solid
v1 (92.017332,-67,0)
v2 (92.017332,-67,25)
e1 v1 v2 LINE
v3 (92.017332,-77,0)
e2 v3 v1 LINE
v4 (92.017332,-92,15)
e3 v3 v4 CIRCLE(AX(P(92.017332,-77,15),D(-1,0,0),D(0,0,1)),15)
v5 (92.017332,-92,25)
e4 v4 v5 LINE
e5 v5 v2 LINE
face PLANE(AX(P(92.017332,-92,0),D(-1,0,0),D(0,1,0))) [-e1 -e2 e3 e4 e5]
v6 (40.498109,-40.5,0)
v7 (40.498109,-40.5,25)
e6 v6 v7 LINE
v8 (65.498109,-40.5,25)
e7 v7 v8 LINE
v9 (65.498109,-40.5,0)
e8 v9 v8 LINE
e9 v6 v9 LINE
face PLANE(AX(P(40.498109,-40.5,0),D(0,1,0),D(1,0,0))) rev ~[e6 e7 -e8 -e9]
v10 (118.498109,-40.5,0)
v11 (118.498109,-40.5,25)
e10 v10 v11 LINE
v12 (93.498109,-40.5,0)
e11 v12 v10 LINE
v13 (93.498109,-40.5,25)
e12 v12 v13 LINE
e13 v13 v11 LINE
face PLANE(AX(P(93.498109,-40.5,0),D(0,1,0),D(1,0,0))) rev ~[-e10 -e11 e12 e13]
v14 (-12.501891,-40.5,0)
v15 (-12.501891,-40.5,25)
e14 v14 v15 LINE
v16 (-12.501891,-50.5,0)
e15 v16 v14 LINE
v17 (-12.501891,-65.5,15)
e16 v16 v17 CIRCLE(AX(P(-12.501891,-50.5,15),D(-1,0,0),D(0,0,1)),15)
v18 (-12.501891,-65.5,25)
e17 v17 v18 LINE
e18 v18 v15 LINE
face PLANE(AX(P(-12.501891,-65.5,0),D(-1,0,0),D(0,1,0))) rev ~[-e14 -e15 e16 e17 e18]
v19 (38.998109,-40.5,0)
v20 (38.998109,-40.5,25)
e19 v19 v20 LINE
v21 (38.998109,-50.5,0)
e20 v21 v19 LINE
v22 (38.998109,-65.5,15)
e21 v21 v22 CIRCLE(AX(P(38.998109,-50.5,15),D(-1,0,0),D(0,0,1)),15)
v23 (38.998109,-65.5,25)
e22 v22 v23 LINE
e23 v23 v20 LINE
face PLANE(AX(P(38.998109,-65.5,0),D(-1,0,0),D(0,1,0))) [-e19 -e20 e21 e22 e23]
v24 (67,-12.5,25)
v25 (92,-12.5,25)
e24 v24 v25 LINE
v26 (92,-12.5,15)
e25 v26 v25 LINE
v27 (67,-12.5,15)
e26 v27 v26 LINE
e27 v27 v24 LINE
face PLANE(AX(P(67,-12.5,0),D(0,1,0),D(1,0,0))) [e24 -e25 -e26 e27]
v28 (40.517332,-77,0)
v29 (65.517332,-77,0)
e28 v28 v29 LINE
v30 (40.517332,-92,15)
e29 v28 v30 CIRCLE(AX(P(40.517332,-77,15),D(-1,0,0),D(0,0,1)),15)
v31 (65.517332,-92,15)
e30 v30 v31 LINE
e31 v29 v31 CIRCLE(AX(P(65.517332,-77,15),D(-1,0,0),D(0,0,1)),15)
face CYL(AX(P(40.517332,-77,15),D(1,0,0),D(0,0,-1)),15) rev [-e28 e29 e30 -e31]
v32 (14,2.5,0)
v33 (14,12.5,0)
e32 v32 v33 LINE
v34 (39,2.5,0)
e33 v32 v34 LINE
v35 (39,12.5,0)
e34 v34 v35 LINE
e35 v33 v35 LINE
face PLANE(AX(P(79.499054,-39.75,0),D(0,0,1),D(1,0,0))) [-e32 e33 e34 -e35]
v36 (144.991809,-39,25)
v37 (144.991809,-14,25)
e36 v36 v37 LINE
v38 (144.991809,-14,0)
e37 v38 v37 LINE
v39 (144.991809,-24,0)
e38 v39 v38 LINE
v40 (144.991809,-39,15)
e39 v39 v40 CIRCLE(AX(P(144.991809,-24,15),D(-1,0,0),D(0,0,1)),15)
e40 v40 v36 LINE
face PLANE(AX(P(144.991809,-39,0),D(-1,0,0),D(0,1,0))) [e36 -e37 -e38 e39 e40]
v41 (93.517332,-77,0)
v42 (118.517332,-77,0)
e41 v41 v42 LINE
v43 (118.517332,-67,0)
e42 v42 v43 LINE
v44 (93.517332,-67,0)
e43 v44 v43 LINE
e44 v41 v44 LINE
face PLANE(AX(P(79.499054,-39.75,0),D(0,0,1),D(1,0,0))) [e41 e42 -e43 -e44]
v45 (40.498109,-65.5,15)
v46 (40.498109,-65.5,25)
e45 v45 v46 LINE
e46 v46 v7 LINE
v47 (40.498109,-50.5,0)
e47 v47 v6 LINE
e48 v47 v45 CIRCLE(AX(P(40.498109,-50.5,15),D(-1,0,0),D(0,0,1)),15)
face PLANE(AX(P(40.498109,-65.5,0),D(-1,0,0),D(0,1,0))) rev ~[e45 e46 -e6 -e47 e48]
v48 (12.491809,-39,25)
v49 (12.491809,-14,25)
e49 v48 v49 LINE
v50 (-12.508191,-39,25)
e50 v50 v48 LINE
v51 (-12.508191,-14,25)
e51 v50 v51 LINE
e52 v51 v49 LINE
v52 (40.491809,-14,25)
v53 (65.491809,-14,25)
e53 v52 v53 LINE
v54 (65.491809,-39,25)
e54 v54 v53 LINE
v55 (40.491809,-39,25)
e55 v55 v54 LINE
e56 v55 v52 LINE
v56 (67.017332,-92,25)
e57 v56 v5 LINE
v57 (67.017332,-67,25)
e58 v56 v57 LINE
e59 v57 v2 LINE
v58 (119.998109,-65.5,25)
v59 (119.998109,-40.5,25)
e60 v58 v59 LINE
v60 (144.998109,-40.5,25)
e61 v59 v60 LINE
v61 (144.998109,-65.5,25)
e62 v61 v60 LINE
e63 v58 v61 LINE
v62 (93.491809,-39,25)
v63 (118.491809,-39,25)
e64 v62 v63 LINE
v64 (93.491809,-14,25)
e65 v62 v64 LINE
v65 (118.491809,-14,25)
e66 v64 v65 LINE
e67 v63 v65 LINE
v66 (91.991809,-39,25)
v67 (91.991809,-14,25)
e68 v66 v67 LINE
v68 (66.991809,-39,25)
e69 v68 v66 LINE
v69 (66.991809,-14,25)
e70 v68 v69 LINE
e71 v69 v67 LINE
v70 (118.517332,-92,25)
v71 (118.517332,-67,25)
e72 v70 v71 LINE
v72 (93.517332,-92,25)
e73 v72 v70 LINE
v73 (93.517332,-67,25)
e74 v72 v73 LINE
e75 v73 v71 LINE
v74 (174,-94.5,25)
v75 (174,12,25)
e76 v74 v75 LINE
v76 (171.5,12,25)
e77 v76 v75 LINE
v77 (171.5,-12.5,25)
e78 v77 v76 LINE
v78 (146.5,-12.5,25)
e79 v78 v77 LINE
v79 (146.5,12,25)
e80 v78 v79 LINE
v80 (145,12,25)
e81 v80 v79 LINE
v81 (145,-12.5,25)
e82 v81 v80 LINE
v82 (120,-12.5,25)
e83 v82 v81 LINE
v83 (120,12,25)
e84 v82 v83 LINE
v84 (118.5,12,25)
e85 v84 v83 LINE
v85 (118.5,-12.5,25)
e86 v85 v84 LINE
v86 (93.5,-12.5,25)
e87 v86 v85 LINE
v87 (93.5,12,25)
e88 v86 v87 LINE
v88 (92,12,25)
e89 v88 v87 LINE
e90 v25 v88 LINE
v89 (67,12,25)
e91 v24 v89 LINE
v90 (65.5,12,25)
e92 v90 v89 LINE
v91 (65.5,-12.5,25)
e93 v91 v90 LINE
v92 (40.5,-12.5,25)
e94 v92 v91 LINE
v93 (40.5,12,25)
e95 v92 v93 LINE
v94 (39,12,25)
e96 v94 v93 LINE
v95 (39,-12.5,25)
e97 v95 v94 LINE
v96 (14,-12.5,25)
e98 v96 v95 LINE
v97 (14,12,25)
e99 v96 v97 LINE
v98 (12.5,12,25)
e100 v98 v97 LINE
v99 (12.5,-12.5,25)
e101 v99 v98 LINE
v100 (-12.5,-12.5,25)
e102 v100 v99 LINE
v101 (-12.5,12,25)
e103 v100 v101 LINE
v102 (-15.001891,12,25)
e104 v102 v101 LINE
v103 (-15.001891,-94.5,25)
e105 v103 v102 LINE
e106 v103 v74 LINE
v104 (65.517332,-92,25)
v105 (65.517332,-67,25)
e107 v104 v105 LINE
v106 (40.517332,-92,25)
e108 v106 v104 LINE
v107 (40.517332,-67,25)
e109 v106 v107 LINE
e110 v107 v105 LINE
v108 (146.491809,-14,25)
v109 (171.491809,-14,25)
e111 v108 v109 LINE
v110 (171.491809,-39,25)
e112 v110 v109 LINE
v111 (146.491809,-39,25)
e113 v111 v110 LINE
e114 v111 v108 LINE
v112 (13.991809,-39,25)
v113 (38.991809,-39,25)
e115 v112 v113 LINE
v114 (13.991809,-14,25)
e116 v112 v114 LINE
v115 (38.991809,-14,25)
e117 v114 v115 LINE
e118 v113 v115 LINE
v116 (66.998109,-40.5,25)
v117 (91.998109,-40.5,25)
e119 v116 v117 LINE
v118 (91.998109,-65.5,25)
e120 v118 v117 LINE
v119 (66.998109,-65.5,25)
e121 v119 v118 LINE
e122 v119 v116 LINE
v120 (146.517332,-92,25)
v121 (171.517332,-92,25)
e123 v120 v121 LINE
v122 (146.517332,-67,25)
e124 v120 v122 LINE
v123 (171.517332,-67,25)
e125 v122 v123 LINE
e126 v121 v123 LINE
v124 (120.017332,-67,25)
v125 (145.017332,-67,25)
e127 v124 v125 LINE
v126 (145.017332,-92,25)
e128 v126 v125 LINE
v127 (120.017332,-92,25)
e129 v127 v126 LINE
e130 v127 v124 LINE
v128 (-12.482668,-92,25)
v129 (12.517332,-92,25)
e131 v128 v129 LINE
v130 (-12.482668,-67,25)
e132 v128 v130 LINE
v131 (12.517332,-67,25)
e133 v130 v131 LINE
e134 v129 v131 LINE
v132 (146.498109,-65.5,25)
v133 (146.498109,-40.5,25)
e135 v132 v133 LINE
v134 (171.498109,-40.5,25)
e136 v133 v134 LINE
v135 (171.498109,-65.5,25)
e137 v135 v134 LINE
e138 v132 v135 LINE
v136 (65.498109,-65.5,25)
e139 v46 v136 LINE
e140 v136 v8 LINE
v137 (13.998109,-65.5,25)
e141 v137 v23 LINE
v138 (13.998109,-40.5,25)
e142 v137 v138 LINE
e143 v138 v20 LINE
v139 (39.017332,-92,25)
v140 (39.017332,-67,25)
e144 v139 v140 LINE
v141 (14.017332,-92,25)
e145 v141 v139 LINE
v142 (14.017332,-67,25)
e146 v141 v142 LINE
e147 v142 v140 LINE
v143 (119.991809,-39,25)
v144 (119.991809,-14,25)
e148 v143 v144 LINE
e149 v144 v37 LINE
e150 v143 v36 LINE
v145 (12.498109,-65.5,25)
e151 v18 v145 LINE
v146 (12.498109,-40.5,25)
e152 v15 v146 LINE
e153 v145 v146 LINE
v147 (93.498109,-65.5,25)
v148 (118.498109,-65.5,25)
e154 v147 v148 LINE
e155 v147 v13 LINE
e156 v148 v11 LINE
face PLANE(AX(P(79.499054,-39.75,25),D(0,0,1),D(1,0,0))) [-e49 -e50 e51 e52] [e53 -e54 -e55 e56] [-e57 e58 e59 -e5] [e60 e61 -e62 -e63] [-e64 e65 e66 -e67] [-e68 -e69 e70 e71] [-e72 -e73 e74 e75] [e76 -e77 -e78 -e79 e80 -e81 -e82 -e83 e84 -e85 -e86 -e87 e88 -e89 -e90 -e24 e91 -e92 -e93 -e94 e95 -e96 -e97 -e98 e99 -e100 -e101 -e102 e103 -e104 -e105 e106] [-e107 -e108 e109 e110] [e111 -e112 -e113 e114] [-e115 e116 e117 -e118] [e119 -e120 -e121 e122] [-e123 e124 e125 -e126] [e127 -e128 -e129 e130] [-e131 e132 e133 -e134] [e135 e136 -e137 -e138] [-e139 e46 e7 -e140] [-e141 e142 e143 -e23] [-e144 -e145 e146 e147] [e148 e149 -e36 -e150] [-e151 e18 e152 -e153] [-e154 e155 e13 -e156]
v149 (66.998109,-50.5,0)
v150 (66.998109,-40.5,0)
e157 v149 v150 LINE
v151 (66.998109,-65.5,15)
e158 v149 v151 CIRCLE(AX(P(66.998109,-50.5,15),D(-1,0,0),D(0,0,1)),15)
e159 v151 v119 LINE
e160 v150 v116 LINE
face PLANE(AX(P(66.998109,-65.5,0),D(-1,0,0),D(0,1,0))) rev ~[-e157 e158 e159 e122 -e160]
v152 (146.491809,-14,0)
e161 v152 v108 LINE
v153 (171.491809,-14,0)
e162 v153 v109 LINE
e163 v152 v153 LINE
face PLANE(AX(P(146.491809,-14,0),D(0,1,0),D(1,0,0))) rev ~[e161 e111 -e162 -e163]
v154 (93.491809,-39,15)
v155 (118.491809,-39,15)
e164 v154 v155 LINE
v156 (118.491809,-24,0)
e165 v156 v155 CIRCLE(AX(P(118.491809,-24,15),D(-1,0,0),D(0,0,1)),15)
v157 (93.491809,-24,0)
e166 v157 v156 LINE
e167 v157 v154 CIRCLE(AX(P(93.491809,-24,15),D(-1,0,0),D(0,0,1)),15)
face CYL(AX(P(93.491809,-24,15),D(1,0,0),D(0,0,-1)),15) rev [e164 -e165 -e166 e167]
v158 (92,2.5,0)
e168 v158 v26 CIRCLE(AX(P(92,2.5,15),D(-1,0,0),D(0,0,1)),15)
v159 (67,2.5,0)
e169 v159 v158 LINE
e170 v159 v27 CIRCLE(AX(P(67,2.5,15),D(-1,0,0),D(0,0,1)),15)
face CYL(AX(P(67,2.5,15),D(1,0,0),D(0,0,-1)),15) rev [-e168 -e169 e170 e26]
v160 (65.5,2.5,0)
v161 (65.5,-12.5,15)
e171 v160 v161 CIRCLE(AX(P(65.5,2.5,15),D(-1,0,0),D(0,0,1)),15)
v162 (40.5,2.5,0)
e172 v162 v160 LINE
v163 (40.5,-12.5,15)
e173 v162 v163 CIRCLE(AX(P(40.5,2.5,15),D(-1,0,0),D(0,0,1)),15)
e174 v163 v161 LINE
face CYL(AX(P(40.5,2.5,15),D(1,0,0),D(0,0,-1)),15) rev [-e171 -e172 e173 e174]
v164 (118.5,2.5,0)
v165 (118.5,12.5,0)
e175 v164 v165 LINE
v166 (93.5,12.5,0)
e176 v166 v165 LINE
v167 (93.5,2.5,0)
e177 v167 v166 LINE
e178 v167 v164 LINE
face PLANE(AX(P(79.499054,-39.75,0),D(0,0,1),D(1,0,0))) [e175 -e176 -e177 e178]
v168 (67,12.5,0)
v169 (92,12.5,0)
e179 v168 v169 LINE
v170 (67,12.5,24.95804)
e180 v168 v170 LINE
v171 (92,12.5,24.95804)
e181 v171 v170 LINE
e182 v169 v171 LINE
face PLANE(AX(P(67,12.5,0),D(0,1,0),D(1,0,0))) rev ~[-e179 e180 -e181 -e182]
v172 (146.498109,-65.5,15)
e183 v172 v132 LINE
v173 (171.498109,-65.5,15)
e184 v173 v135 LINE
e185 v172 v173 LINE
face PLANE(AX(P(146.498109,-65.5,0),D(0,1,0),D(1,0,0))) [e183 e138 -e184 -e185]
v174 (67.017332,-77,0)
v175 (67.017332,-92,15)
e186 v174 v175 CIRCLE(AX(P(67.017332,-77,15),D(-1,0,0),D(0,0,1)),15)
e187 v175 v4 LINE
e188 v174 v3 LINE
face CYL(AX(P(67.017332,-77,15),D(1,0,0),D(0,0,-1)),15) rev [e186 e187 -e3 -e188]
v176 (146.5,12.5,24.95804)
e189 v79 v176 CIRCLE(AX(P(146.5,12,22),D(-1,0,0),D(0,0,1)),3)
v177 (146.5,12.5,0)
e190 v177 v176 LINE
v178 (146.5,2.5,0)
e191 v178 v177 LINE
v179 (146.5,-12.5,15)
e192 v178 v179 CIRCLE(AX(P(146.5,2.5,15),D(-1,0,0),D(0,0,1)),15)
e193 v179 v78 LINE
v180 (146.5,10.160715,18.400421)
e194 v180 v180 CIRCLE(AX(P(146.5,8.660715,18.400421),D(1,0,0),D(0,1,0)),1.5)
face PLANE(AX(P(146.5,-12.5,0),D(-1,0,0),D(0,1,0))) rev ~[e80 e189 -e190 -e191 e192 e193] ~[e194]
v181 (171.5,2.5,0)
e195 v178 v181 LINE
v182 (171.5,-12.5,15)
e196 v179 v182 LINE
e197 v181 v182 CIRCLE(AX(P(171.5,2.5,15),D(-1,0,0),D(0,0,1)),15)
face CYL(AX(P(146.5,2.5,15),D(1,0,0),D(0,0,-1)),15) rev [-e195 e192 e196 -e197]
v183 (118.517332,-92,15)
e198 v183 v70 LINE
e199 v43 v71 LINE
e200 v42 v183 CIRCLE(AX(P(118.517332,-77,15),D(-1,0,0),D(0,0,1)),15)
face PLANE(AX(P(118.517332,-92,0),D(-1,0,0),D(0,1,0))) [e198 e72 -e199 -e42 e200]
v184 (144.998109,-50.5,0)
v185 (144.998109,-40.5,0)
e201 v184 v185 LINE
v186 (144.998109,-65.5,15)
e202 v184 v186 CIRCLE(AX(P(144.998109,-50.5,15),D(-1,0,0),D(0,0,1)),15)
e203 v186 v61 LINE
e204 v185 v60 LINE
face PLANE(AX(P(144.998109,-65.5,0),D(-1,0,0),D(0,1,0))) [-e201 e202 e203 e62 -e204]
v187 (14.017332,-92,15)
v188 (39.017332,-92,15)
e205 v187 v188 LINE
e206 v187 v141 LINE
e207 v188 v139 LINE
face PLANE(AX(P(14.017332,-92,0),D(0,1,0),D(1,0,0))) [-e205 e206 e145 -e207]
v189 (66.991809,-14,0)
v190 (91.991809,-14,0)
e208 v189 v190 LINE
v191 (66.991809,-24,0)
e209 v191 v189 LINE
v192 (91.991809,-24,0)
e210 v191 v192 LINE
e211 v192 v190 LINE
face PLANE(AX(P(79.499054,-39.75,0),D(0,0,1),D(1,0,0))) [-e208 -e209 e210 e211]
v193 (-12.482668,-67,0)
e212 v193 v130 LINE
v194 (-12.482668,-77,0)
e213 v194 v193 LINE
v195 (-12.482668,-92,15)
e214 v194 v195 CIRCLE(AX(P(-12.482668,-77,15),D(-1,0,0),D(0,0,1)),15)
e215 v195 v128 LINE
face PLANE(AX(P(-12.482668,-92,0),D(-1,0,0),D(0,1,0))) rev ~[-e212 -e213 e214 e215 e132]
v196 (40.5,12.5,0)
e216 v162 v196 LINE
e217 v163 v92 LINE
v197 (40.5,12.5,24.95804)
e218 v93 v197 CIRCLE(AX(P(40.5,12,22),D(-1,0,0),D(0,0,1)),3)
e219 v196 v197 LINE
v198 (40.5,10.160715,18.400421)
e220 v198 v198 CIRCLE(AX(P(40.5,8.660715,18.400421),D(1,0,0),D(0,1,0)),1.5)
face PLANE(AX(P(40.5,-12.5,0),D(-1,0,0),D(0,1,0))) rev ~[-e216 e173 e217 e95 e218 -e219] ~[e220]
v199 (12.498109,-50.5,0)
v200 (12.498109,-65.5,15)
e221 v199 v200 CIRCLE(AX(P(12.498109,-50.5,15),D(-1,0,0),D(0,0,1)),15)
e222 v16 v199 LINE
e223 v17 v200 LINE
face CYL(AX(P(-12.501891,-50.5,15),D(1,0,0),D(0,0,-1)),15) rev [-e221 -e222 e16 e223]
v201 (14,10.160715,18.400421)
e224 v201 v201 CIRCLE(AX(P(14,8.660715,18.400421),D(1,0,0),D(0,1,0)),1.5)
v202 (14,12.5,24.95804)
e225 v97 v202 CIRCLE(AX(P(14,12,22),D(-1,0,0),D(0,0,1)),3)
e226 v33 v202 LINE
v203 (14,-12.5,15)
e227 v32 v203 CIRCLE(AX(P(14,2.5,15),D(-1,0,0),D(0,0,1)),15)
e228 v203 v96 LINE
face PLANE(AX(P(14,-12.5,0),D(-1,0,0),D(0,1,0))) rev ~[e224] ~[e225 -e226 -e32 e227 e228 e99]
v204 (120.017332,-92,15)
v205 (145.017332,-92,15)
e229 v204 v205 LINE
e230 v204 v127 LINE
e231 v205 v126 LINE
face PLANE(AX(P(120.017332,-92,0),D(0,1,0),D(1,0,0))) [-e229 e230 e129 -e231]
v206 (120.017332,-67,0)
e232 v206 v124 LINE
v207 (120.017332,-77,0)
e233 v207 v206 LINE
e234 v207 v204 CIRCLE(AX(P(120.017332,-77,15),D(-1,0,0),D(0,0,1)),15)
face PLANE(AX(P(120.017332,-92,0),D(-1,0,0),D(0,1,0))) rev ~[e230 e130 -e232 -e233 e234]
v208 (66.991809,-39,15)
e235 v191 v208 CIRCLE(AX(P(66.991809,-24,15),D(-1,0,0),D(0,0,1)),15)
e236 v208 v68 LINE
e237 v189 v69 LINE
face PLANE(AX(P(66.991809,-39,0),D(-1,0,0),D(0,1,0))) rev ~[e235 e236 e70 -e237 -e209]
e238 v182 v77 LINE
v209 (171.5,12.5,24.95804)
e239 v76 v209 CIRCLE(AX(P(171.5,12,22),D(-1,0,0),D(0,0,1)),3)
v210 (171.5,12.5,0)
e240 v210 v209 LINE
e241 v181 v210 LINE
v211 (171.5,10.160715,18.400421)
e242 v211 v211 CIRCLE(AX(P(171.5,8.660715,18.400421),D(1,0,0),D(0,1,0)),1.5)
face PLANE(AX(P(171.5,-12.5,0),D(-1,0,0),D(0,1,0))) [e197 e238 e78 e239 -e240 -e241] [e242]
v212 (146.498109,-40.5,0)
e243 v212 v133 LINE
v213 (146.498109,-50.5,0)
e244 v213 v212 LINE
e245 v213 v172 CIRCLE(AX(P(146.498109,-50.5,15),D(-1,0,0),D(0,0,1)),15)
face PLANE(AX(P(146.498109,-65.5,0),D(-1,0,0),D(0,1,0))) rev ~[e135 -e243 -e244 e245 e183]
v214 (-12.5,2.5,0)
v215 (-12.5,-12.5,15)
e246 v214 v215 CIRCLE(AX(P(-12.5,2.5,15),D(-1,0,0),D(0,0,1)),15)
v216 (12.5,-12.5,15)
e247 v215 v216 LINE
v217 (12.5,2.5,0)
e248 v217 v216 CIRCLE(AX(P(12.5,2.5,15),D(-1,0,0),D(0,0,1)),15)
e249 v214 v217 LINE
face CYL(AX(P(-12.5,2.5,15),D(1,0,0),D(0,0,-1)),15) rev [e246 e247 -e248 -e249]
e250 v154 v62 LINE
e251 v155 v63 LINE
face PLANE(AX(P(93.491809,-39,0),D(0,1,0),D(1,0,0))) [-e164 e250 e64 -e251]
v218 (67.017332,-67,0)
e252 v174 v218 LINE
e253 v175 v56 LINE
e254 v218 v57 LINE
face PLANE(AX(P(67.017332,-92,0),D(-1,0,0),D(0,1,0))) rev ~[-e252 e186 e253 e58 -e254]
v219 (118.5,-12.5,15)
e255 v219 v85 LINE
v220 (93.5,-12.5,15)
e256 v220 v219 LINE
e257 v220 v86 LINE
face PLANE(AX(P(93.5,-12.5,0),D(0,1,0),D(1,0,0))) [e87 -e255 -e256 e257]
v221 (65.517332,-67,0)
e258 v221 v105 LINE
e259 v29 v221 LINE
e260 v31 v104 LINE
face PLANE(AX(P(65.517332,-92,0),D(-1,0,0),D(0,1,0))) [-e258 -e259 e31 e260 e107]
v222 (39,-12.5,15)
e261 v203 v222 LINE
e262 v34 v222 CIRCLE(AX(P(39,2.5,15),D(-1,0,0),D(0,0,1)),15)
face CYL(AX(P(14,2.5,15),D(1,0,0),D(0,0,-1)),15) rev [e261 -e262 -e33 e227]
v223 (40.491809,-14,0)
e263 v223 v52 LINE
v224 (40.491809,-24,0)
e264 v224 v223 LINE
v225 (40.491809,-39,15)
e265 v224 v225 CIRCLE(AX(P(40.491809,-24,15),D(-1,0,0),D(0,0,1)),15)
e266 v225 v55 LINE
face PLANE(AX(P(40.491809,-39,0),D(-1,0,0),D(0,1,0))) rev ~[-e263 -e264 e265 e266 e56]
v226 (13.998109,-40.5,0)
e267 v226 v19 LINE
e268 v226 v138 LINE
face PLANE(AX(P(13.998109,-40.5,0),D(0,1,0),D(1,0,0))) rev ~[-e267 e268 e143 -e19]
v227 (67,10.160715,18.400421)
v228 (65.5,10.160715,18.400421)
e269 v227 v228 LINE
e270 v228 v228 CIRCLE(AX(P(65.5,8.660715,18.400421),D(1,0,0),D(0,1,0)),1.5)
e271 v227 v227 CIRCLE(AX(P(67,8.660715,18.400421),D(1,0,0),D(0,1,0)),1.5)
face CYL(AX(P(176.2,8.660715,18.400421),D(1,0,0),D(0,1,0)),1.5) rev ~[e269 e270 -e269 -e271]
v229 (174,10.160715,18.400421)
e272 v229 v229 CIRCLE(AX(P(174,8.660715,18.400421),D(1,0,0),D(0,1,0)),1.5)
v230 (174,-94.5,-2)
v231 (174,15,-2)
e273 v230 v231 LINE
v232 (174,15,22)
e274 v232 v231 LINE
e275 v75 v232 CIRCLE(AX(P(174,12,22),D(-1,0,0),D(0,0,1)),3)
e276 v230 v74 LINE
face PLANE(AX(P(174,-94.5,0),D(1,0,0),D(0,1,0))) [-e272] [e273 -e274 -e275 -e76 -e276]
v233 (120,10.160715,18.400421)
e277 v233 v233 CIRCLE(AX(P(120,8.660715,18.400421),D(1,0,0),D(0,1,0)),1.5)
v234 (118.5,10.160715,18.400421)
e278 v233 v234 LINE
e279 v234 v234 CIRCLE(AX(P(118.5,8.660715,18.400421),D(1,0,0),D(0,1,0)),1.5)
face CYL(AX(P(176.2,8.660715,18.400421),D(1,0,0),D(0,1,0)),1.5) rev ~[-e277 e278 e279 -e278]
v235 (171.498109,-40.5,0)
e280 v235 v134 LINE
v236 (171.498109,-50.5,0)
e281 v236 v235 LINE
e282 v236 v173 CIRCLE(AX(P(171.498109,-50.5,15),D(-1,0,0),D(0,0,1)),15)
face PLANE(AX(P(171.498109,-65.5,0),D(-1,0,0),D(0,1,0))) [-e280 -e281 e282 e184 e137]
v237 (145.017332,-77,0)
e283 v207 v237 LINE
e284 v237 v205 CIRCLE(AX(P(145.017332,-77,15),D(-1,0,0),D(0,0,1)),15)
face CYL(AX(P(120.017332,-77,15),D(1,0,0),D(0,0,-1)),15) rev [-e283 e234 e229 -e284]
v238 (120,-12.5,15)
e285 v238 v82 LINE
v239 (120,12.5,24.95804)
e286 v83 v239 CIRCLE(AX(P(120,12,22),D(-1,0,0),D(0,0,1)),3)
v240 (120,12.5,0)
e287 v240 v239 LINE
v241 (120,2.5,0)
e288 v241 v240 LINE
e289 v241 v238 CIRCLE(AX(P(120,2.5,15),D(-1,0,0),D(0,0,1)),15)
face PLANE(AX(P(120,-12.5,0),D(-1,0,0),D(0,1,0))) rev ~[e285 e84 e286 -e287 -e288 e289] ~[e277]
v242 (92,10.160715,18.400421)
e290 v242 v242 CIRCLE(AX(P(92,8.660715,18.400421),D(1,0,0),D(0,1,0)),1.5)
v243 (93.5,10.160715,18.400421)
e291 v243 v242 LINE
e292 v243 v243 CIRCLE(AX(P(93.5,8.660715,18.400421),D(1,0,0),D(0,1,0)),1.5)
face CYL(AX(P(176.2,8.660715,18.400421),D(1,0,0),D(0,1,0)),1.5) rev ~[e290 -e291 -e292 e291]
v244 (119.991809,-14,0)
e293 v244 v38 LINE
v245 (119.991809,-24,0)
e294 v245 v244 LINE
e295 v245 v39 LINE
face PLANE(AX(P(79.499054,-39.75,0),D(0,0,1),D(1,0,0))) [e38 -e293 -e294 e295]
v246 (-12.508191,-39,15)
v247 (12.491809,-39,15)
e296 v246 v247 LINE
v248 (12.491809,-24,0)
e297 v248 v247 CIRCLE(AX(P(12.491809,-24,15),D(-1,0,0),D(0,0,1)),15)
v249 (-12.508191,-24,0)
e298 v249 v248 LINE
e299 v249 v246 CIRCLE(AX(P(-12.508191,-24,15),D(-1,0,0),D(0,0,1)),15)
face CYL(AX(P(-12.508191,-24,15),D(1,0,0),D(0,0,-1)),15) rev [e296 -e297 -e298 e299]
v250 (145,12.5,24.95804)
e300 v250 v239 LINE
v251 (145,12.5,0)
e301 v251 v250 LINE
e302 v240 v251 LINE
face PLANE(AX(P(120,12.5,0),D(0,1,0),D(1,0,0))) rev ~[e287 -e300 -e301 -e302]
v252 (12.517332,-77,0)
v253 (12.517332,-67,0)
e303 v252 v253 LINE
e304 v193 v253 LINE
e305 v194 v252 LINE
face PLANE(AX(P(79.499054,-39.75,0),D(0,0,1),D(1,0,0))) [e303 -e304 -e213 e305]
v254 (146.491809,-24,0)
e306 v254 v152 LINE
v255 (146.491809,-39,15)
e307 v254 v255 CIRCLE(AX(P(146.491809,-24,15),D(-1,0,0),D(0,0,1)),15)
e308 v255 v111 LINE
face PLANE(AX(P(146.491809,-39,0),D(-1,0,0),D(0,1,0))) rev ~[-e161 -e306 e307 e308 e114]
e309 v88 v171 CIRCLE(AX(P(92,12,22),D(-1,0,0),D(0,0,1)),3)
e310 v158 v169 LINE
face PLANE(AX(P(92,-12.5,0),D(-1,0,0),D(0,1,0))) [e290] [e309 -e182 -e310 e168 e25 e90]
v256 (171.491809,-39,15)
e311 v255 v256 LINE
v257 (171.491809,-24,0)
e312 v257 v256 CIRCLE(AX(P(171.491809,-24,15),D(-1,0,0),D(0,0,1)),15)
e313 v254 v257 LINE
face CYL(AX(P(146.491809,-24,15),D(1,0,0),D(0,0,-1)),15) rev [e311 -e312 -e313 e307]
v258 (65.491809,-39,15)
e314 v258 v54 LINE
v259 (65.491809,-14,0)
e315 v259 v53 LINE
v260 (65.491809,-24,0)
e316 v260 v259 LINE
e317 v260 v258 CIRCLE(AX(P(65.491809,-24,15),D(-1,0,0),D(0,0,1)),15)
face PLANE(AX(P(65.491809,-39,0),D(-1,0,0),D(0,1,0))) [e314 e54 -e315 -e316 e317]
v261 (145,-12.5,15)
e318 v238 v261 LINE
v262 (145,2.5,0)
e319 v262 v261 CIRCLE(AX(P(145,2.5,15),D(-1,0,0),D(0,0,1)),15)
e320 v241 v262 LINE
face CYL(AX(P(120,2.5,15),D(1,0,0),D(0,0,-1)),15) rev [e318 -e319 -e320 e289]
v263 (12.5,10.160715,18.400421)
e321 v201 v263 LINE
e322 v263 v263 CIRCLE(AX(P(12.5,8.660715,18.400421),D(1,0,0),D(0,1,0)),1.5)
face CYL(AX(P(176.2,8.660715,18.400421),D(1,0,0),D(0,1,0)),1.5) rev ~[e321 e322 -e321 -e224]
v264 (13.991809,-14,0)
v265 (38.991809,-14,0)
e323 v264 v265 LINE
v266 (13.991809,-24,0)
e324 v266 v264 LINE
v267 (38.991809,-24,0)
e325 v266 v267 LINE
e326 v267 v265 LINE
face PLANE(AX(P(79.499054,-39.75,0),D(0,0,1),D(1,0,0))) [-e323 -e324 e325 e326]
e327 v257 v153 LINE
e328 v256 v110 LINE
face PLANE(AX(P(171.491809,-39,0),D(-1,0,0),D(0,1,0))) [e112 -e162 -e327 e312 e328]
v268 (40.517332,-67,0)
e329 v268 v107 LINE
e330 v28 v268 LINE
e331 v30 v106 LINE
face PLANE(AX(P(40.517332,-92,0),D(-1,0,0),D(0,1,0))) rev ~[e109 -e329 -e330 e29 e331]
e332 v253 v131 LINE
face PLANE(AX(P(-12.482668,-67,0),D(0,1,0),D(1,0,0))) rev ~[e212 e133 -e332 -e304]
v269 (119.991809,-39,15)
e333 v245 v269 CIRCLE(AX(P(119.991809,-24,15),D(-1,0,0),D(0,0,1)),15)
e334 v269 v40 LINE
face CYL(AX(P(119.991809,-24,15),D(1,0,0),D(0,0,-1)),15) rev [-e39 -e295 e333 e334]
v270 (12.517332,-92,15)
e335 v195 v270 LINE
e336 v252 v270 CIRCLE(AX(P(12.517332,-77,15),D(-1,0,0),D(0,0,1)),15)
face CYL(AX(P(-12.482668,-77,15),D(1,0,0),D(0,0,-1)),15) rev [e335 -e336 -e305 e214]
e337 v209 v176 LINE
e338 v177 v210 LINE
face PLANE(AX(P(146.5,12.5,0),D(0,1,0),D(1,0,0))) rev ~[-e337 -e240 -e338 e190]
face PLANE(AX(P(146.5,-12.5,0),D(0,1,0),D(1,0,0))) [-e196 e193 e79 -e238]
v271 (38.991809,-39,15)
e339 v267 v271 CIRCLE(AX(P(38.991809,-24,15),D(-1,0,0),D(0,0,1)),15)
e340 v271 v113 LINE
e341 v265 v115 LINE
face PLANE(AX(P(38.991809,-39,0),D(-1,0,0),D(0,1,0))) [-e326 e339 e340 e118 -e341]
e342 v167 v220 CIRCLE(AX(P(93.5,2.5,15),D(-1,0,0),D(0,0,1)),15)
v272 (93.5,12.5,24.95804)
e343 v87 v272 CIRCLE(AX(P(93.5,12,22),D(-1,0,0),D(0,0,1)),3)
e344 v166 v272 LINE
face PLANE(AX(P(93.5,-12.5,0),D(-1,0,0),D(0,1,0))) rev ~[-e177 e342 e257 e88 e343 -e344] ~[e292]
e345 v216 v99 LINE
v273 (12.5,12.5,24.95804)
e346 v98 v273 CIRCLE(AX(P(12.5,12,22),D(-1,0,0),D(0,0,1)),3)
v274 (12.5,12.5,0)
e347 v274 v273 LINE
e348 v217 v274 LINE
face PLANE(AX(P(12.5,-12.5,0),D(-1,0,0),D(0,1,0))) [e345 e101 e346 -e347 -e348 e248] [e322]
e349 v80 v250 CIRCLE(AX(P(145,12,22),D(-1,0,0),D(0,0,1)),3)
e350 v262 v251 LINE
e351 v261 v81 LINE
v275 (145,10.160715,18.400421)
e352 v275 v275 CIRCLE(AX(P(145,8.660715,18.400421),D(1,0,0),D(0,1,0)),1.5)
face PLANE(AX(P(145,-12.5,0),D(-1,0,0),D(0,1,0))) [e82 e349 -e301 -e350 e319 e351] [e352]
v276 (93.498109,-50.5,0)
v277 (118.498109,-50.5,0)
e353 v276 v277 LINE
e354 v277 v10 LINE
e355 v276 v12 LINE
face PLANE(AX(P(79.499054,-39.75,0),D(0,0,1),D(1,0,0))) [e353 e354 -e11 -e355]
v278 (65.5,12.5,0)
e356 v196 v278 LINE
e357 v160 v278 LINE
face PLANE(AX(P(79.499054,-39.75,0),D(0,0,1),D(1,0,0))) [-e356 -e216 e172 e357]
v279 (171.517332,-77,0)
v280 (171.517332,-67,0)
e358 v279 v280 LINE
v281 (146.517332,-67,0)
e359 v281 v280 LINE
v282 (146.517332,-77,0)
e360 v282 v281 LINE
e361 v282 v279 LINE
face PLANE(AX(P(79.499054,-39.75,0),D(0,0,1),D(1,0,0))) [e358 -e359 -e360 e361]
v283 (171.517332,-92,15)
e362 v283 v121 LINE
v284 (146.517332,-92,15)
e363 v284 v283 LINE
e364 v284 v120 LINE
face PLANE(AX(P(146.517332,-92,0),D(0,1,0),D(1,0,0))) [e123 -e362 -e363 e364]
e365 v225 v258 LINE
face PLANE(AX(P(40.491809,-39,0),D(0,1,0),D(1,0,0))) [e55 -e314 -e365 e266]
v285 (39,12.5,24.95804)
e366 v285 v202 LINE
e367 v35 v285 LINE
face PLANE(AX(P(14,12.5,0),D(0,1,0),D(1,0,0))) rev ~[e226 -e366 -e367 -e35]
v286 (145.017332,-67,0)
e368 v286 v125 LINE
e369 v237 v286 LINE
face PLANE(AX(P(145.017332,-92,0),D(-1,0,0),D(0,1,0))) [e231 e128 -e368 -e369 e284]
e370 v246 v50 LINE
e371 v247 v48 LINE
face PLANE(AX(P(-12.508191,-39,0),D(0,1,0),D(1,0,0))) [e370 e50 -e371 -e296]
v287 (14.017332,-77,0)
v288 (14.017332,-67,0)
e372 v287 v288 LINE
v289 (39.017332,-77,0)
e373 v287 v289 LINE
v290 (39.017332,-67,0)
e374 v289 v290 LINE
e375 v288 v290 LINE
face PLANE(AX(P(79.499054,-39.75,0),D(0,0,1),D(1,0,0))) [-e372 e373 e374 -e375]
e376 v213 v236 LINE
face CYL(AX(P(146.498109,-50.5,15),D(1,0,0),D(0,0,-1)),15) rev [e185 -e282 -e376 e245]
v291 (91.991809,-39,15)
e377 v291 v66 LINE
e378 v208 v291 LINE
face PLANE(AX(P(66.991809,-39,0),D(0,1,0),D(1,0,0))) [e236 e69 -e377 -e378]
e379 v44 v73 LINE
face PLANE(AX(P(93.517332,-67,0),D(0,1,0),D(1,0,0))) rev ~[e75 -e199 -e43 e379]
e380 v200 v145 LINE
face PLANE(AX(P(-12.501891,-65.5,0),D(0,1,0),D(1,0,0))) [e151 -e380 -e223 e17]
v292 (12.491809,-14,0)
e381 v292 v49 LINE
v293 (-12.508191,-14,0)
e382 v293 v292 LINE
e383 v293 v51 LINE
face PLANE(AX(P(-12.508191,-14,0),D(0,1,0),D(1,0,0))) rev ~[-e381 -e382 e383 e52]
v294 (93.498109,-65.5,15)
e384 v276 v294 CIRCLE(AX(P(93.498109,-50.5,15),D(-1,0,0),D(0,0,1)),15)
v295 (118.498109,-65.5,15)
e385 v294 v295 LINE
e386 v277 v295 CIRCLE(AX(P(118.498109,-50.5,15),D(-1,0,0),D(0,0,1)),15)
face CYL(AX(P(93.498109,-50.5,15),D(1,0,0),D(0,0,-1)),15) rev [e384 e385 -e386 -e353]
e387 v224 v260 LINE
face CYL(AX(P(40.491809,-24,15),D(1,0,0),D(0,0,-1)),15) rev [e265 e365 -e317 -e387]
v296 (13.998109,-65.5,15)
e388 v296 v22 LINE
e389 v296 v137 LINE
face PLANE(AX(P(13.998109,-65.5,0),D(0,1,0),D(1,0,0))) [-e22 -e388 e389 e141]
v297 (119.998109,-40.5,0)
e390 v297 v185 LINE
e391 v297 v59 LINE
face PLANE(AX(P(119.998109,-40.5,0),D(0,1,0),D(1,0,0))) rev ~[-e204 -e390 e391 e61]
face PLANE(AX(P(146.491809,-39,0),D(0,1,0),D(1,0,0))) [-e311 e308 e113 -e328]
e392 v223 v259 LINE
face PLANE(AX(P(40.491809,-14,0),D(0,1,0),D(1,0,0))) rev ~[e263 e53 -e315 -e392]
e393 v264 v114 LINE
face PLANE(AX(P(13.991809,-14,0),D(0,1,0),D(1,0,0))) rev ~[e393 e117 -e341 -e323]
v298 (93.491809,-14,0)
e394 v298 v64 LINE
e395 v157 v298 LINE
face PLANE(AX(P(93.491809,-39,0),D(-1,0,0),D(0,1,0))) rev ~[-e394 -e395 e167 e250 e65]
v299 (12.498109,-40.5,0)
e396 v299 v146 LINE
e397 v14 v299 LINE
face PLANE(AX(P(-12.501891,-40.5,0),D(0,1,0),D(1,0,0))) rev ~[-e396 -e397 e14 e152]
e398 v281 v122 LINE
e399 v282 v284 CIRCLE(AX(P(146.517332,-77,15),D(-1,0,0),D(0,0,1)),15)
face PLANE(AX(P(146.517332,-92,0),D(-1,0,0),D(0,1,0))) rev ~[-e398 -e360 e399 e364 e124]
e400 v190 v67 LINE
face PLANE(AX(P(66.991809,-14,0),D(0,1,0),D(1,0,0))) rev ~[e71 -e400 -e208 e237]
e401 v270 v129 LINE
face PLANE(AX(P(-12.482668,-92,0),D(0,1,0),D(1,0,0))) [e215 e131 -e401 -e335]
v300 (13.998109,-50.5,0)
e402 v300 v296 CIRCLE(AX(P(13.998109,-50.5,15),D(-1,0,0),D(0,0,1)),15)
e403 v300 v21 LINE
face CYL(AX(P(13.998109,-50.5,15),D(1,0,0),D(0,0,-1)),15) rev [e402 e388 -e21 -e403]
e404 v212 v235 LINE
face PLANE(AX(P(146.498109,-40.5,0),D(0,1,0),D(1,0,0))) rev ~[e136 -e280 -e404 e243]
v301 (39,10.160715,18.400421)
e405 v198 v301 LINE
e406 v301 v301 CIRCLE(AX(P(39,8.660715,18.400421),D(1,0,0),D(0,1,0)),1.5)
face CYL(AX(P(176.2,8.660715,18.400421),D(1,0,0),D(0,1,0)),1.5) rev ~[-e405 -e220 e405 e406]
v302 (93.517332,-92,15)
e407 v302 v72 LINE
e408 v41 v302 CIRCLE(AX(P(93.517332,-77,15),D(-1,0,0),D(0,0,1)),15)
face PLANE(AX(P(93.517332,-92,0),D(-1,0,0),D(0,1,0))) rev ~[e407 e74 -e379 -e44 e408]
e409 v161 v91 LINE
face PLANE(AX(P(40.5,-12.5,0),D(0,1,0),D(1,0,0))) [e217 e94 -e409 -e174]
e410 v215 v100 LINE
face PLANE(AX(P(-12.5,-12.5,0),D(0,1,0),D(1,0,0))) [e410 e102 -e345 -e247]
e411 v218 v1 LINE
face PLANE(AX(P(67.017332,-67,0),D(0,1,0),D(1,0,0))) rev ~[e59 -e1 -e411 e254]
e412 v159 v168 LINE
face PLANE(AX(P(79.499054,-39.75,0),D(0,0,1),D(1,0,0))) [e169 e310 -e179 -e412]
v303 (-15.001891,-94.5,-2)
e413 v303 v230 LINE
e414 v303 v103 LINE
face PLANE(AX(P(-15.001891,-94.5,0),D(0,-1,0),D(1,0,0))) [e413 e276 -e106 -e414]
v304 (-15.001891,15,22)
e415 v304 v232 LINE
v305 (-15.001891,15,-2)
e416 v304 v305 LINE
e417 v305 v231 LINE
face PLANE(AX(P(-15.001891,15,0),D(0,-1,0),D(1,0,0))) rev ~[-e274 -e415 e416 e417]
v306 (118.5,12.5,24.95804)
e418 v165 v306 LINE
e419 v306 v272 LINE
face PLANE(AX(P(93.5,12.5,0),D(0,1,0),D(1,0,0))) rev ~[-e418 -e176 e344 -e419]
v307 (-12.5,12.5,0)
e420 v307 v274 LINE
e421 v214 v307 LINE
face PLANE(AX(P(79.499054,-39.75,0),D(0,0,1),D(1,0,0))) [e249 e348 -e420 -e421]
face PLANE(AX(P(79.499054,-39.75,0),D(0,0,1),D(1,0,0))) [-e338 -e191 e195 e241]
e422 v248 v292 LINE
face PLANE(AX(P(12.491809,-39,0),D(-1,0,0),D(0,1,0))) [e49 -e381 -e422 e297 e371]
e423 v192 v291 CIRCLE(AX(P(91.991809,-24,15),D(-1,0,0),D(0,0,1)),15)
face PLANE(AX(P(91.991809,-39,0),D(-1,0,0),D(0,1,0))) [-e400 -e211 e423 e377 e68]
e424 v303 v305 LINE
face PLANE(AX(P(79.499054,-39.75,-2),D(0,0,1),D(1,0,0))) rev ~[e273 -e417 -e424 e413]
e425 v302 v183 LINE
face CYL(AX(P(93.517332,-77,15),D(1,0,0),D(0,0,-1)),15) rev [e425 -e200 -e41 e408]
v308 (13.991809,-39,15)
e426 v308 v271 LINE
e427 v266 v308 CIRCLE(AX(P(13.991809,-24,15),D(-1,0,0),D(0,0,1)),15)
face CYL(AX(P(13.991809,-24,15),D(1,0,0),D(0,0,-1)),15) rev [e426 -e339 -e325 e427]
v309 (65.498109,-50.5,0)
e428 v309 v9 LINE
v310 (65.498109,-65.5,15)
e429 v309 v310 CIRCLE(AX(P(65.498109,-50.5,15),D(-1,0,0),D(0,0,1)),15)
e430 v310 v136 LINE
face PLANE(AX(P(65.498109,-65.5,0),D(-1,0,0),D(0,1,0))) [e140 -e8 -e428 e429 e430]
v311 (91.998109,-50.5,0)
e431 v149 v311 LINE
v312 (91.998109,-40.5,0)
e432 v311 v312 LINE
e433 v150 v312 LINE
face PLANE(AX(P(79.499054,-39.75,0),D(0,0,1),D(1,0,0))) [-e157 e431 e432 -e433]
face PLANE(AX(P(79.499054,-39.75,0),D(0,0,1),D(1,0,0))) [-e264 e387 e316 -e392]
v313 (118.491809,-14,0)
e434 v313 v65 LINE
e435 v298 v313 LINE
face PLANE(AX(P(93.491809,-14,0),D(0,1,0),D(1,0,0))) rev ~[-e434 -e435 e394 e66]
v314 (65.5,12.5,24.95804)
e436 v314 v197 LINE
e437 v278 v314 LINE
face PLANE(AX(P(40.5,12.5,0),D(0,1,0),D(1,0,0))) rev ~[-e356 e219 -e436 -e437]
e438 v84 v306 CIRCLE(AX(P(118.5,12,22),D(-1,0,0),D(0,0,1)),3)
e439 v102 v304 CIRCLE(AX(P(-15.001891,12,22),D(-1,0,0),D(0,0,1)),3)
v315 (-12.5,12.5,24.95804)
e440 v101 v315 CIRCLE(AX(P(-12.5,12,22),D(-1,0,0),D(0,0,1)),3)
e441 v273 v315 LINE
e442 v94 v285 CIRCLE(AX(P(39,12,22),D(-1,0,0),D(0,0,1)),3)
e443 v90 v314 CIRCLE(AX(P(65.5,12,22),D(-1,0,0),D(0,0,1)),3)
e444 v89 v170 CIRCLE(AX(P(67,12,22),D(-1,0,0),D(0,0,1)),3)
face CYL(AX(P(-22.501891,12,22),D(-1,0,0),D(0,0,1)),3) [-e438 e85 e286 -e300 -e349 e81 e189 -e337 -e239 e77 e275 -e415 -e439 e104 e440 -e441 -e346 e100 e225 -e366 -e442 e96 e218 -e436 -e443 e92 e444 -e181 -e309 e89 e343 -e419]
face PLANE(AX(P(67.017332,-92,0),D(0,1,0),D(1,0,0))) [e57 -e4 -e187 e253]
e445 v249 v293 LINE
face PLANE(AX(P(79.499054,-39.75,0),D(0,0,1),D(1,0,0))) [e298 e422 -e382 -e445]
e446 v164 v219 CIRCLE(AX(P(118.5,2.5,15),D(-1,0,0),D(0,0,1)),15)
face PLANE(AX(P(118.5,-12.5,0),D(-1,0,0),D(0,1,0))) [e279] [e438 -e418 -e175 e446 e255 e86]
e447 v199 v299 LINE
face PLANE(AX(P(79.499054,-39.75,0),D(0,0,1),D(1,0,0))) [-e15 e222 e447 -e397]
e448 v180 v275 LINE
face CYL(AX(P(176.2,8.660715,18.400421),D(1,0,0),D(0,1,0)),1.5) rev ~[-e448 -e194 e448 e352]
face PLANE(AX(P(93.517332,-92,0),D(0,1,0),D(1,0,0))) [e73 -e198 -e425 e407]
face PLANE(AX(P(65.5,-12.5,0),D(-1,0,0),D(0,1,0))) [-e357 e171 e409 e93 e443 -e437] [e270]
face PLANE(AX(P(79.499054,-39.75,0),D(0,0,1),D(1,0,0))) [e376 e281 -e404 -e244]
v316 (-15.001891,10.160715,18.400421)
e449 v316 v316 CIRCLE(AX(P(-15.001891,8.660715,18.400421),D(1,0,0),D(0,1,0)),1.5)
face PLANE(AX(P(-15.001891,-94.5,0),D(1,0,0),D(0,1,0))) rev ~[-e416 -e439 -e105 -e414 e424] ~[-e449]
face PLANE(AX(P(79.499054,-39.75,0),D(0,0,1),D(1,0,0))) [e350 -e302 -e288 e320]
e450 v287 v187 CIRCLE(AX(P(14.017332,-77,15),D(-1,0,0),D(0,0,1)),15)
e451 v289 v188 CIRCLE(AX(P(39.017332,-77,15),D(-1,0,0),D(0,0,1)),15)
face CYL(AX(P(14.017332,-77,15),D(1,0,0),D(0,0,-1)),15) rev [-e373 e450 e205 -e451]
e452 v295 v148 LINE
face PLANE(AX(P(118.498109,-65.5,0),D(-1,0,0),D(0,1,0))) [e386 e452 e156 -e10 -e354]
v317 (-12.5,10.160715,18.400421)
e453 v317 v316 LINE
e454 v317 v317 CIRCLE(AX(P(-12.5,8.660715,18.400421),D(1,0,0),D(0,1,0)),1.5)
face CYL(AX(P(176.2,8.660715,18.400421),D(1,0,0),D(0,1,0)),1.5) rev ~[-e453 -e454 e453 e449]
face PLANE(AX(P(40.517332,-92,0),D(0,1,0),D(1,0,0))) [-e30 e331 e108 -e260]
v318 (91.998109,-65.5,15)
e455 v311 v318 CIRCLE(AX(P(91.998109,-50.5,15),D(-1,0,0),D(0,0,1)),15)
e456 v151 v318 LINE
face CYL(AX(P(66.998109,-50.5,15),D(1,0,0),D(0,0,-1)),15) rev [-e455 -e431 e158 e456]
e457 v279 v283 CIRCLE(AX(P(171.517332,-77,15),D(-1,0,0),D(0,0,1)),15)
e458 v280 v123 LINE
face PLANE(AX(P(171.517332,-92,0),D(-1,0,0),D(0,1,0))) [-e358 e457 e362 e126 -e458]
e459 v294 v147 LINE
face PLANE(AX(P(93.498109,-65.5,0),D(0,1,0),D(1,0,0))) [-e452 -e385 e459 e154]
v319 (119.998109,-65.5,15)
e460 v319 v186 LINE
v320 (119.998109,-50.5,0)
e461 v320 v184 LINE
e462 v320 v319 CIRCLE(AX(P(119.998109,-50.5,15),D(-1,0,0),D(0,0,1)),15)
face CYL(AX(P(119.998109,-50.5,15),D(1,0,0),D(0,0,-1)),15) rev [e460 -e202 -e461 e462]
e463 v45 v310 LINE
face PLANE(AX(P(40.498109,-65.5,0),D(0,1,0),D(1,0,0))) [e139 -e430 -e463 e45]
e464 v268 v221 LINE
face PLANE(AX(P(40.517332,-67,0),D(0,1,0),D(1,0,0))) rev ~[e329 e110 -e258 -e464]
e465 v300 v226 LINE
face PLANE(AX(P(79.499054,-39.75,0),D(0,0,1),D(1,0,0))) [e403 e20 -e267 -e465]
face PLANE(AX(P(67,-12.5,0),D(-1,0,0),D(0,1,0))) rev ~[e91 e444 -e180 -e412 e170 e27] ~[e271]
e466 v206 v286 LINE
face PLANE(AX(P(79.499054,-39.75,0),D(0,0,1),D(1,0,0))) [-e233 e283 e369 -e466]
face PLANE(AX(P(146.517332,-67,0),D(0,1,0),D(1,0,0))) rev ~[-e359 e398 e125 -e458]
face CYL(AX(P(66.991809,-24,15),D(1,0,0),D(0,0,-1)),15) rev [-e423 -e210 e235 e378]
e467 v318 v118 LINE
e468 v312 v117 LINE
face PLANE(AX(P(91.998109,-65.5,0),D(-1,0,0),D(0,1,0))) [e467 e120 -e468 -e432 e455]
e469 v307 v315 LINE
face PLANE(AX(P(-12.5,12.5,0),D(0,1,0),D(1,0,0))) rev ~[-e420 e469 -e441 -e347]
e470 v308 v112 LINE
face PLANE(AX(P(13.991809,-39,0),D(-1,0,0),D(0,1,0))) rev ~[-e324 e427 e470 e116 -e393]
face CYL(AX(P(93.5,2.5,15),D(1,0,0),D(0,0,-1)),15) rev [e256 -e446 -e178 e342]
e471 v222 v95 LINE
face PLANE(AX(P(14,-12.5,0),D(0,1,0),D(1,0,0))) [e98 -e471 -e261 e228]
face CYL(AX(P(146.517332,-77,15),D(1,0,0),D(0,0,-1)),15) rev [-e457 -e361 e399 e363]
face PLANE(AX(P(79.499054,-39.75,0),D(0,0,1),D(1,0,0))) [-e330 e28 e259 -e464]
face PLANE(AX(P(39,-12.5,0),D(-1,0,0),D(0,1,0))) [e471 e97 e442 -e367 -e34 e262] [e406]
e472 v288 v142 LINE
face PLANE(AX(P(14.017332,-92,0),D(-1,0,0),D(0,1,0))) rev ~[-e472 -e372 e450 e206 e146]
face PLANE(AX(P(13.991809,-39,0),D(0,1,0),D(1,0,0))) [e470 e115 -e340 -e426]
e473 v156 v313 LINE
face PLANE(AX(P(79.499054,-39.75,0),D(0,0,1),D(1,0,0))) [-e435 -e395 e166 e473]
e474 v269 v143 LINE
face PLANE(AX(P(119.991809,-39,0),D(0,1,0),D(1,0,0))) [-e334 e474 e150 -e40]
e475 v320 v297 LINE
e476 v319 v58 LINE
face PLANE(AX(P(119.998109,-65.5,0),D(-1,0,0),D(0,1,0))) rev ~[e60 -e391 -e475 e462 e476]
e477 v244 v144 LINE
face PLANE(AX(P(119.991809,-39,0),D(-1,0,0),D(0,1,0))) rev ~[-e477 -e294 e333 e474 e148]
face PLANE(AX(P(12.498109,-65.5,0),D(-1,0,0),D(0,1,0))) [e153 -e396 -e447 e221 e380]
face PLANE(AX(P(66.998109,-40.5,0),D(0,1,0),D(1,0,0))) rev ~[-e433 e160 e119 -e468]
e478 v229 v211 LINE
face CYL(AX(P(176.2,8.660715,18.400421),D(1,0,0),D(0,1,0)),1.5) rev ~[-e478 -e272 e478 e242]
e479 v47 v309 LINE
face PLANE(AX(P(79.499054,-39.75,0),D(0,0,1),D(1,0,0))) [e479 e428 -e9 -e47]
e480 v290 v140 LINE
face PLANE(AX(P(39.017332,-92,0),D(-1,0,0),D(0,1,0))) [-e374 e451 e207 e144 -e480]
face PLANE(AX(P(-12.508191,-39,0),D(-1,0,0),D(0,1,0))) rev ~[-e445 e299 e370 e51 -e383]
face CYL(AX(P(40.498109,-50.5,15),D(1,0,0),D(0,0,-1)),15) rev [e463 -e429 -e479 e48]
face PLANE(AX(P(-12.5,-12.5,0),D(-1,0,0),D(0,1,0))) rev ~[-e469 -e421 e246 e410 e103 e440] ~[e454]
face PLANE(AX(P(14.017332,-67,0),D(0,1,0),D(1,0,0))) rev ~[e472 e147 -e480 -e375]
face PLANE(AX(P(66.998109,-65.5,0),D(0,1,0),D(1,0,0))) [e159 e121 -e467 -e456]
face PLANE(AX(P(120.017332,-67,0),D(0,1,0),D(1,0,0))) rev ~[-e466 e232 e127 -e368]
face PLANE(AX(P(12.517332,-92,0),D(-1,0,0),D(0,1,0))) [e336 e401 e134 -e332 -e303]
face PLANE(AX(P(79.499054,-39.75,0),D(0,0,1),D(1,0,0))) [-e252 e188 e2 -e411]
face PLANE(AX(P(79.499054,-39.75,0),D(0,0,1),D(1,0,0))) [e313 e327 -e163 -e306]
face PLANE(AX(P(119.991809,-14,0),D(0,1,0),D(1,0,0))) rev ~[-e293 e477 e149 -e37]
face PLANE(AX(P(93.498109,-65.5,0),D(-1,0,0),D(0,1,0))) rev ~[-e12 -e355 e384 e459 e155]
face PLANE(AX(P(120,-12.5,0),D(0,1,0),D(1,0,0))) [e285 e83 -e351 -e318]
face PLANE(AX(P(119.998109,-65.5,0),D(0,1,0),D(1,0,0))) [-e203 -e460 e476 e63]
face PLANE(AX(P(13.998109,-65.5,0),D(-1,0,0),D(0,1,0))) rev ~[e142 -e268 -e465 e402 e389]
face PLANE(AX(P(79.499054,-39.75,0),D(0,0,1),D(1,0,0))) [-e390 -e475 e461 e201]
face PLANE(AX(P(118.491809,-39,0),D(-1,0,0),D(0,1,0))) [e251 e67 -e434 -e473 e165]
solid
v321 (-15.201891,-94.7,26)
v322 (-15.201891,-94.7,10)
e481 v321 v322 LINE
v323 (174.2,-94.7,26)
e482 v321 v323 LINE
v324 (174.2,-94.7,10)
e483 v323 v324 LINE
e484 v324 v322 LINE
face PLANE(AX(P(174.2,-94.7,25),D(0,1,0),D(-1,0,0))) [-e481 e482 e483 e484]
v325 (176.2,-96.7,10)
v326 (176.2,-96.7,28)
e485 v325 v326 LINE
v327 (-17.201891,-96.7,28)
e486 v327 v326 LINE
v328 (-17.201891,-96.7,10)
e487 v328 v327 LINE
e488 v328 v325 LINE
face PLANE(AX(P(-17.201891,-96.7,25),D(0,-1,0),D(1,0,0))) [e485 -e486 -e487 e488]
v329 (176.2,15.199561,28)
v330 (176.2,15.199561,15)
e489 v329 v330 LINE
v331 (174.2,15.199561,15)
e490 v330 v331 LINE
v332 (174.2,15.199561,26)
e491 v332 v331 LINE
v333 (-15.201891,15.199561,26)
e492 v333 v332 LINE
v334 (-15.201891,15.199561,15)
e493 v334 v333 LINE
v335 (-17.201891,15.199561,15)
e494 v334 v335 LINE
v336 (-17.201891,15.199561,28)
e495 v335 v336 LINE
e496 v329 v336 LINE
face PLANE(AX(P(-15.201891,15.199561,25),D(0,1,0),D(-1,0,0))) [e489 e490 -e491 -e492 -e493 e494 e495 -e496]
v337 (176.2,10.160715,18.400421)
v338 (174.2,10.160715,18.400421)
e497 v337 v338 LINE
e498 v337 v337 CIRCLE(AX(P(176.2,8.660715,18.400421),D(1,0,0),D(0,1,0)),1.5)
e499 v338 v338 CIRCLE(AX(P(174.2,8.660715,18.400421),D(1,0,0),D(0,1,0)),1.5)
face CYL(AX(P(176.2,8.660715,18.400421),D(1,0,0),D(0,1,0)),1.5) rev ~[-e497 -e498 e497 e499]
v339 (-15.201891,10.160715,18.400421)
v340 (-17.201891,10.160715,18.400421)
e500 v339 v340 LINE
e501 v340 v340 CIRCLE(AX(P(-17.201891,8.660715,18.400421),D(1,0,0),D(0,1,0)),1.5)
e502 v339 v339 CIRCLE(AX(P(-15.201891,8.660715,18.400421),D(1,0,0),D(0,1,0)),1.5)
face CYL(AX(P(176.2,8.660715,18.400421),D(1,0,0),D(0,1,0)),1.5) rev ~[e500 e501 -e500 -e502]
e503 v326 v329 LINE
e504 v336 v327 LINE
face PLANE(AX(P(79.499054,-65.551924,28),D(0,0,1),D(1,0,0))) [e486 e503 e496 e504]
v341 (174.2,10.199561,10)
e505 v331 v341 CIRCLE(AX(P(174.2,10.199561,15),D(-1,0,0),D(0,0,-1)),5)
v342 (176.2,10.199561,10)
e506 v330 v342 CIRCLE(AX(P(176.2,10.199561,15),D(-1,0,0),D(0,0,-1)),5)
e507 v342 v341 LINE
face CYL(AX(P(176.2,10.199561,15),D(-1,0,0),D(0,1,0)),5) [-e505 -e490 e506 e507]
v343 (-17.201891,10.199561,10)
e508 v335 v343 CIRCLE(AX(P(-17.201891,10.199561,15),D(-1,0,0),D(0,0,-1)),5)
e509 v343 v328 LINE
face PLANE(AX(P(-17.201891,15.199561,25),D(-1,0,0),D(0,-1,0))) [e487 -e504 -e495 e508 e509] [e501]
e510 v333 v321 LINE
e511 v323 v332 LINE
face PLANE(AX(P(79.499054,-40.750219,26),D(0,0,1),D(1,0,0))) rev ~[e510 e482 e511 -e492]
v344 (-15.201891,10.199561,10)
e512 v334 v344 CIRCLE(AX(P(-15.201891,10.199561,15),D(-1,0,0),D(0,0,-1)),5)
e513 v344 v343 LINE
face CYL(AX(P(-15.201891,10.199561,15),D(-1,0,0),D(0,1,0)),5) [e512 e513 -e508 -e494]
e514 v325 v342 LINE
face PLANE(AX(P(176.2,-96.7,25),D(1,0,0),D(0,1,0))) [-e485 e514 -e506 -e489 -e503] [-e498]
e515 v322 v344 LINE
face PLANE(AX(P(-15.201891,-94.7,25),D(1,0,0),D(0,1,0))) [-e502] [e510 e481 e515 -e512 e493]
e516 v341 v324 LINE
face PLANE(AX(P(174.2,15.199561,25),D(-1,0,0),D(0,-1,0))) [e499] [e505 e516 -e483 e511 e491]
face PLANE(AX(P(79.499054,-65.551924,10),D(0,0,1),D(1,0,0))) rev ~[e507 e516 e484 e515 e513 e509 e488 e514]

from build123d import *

# Parameters (mm, degrees)
F0_W          = 189.0018912738
F0_H          = 109.5
F0_W_2        = 25
F0_H_2        = 25
F1_DEPTH      = 25
F2_W          = 189.0018912738
F2_H          = 109.5
F3_DEPTH      = 2
F4_R          = 15
F6_DEPTH      = 3
F6_DEPTH_BACK = 15
F7_W          = 193.4018912738
F7_H          = 111.8995610192
F8_DEPTH      = 2
F9_T1_DEPTH   = 204.0018912738
F10_R         = 1.5
F11_DEPTH     = 200
F12_R         = 5


# Not quite as in the source:
# - a fillet or chamfer that OpenCascade refuses, or shapes differently, is made with other operations: its cross-section is extruded or revolved along the edge and cut away or added


with BuildPart() as f1:
    # F0 (on Top) → F1 (new body)
    with BuildSketch(Plane.XY):
        with Locations((79.4990543631, -39.75)):
            Rectangle(F0_W, F0_H)
        with Locations((0.0173321555, -79.5)):
            Rectangle(F0_W_2, F0_H_2, mode=Mode.SUBTRACT)
        with Locations((26.5173321555, -79.5)):
            Rectangle(F0_W_2, F0_H_2, mode=Mode.SUBTRACT)
        with Locations((53.0173321555, -79.5)):
            Rectangle(F0_W_2, F0_H_2, mode=Mode.SUBTRACT)
        with Locations((-0.0018912738, -53)):
            Rectangle(F0_W_2, F0_H_2, mode=Mode.SUBTRACT)
        with Locations((26.4981087262, -53)):
            Rectangle(F0_W_2, F0_H_2, mode=Mode.SUBTRACT)
        with Locations((52.9981087262, -53)):
            Rectangle(F0_W_2, F0_H_2, mode=Mode.SUBTRACT)
        with Locations((79.4981087262, -53)):
            Rectangle(F0_W_2, F0_H_2, mode=Mode.SUBTRACT)
        with Locations((79.5173321555, -79.5)):
            Rectangle(F0_W_2, F0_H_2, mode=Mode.SUBTRACT)
        with Locations((106.0173321555, -79.5)):
            Rectangle(F0_W_2, F0_H_2, mode=Mode.SUBTRACT)
        with Locations((132.5173321555, -79.5)):
            Rectangle(F0_W_2, F0_H_2, mode=Mode.SUBTRACT)
        with Locations((159.0173321555, -79.5)):
            Rectangle(F0_W_2, F0_H_2, mode=Mode.SUBTRACT)
        with Locations((105.9981087262, -53)):
            Rectangle(F0_W_2, F0_H_2, mode=Mode.SUBTRACT)
        with Locations((132.4981087262, -53)):
            Rectangle(F0_W_2, F0_H_2, mode=Mode.SUBTRACT)
        with Locations((158.9981087262, -53)):
            Rectangle(F0_W_2, F0_H_2, mode=Mode.SUBTRACT)
        with Locations((-0.0081907397, -26.5)):
            Rectangle(F0_W_2, F0_H_2, mode=Mode.SUBTRACT)
        with Locations((26.4918092603, -26.5)):
            Rectangle(F0_W_2, F0_H_2, mode=Mode.SUBTRACT)
        with Locations((52.9918092603, -26.5)):
            Rectangle(F0_W_2, F0_H_2, mode=Mode.SUBTRACT)
        with Locations((79.4918092603, -26.5)):
            Rectangle(F0_W_2, F0_H_2, mode=Mode.SUBTRACT)
        Rectangle(F0_W_2, F0_H_2, mode=Mode.SUBTRACT)
        with Locations((26.5, 0)):
            Rectangle(F0_W_2, F0_H_2, mode=Mode.SUBTRACT)
        with Locations((53, 0)):
            Rectangle(F0_W_2, F0_H_2, mode=Mode.SUBTRACT)
        with Locations((105.9918092603, -26.5)):
            Rectangle(F0_W_2, F0_H_2, mode=Mode.SUBTRACT)
        with Locations((132.4918092603, -26.5)):
            Rectangle(F0_W_2, F0_H_2, mode=Mode.SUBTRACT)
        with Locations((158.9918092603, -26.5)):
            Rectangle(F0_W_2, F0_H_2, mode=Mode.SUBTRACT)
        with Locations((79.5, 0)):
            Rectangle(F0_W_2, F0_H_2, mode=Mode.SUBTRACT)
        with Locations((106, 0)):
            Rectangle(F0_W_2, F0_H_2, mode=Mode.SUBTRACT)
        with Locations((132.5, 0)):
            Rectangle(F0_W_2, F0_H_2, mode=Mode.SUBTRACT)
        with Locations((159, 0)):
            Rectangle(F0_W_2, F0_H_2, mode=Mode.SUBTRACT)
    extrude(amount=F1_DEPTH)

    # F2 (on Top) → F3 (join)
    with BuildSketch(Plane.XY):
        with Locations((79.4990543631, -39.75)):
            Rectangle(F2_W, F2_H)
    extrude(amount=-F3_DEPTH)

    # F4
    f4_edges = [f1.edges().sort_by_distance(p)[0] for p in [
        (0, -12.5, 0),
        (26.5, -12.5, 0),
        (53, -12.5, 0),
        (79.5, -12.5, 0),
        (106, -12.5, 0),
        (132.5, -12.5, 0),
        (159, -12.5, 0),
        (-0.008191, -39, 0),
        (26.491809, -39, 0),
        (52.991809, -39, 0),
        (79.491809, -39, 0),
        (105.991809, -39, 0),
        (132.491809, -39, 0),
        (158.991809, -39, 0),
        (158.998109, -65.5, 0),
        (132.498109, -65.5, 0),
        (105.998109, -65.5, 0),
        (79.498109, -65.5, 0),
        (52.998109, -65.5, 0),
        (26.498109, -65.5, 0),
        (-0.001891, -65.5, 0),
        (0.017332, -92, 0),
        (26.517332, -92, 0),
        (53.017332, -92, 0),
        (79.517332, -92, 0),
        (106.017332, -92, 0),
        (132.517332, -92, 0),
        (159.017332, -92, 0),
    ]]
    fillet(f4_edges, radius=F4_R)

    # F9: fillet of radius 3 on 1 edges, made by hand

    # F9_s2 → F9_t1 (cut)
    with BuildSketch(Plane.YZ.offset(-22.5018912738)):
        with BuildLine():
            ThreePointArc((12, 25), (14.1213203436, 24.1213203436), (15, 22))
            Line((15, 22), (15, 25))
            Line((15, 25), (12, 25))
        make_face()
    extrude(amount=F9_T1_DEPTH, mode=Mode.SUBTRACT)


with BuildPart() as f6:
    # F5 (on face) → F6 (new body, two sides)
    with BuildSketch(Plane.XY.offset(25)) as f6_sk:
        Polygon((-15.2018912738, -94.7), (-15.2018912738, 15.1995610192), (-17.2018912738, 15.1995610192), (-17.2018912738, -96.7), (176.2, -96.7), (176.2, 15.1995610192), (174.2, 15.1995610192), (174.2, -94.7), align=None)
    extrude(amount=F6_DEPTH)
    extrude(f6_sk.sketch, amount=-F6_DEPTH_BACK)

    # F7 (on face) → F8 (join)
    with BuildSketch(Plane.XY.offset(28)):
        with Locations((79.4990543631, -40.7502194904)):
            Rectangle(F7_W, F7_H)
    extrude(amount=-F8_DEPTH)


with BuildPart() as f11_tool:
    # F10 (on face) → F11 (new body)
    with BuildSketch(Plane.YZ.offset(176.2)):
        with Locations((8.6607150733, 18.4004213661)):
            Circle(F10_R)
    extrude(amount=-F11_DEPTH)


with BuildPart() as f1_1:
    add(f1.part)

    # F11: cut by f11_tool
    add(f11_tool.part, mode=Mode.SUBTRACT)


with BuildPart() as f6_1:
    add(f6.part)

    # F11: cut by f11_tool
    add(f11_tool.part, mode=Mode.SUBTRACT)

    # F12
    f12_edges = [f6_1.edges().sort_by_distance(p)[0] for p in [
        (175.2, 15.199561, 10),
        (-16.201891, 15.199561, 10),
    ]]
    fillet(f12_edges, radius=F12_R)


solid = Compound([f1_1.part, f6_1.part])
